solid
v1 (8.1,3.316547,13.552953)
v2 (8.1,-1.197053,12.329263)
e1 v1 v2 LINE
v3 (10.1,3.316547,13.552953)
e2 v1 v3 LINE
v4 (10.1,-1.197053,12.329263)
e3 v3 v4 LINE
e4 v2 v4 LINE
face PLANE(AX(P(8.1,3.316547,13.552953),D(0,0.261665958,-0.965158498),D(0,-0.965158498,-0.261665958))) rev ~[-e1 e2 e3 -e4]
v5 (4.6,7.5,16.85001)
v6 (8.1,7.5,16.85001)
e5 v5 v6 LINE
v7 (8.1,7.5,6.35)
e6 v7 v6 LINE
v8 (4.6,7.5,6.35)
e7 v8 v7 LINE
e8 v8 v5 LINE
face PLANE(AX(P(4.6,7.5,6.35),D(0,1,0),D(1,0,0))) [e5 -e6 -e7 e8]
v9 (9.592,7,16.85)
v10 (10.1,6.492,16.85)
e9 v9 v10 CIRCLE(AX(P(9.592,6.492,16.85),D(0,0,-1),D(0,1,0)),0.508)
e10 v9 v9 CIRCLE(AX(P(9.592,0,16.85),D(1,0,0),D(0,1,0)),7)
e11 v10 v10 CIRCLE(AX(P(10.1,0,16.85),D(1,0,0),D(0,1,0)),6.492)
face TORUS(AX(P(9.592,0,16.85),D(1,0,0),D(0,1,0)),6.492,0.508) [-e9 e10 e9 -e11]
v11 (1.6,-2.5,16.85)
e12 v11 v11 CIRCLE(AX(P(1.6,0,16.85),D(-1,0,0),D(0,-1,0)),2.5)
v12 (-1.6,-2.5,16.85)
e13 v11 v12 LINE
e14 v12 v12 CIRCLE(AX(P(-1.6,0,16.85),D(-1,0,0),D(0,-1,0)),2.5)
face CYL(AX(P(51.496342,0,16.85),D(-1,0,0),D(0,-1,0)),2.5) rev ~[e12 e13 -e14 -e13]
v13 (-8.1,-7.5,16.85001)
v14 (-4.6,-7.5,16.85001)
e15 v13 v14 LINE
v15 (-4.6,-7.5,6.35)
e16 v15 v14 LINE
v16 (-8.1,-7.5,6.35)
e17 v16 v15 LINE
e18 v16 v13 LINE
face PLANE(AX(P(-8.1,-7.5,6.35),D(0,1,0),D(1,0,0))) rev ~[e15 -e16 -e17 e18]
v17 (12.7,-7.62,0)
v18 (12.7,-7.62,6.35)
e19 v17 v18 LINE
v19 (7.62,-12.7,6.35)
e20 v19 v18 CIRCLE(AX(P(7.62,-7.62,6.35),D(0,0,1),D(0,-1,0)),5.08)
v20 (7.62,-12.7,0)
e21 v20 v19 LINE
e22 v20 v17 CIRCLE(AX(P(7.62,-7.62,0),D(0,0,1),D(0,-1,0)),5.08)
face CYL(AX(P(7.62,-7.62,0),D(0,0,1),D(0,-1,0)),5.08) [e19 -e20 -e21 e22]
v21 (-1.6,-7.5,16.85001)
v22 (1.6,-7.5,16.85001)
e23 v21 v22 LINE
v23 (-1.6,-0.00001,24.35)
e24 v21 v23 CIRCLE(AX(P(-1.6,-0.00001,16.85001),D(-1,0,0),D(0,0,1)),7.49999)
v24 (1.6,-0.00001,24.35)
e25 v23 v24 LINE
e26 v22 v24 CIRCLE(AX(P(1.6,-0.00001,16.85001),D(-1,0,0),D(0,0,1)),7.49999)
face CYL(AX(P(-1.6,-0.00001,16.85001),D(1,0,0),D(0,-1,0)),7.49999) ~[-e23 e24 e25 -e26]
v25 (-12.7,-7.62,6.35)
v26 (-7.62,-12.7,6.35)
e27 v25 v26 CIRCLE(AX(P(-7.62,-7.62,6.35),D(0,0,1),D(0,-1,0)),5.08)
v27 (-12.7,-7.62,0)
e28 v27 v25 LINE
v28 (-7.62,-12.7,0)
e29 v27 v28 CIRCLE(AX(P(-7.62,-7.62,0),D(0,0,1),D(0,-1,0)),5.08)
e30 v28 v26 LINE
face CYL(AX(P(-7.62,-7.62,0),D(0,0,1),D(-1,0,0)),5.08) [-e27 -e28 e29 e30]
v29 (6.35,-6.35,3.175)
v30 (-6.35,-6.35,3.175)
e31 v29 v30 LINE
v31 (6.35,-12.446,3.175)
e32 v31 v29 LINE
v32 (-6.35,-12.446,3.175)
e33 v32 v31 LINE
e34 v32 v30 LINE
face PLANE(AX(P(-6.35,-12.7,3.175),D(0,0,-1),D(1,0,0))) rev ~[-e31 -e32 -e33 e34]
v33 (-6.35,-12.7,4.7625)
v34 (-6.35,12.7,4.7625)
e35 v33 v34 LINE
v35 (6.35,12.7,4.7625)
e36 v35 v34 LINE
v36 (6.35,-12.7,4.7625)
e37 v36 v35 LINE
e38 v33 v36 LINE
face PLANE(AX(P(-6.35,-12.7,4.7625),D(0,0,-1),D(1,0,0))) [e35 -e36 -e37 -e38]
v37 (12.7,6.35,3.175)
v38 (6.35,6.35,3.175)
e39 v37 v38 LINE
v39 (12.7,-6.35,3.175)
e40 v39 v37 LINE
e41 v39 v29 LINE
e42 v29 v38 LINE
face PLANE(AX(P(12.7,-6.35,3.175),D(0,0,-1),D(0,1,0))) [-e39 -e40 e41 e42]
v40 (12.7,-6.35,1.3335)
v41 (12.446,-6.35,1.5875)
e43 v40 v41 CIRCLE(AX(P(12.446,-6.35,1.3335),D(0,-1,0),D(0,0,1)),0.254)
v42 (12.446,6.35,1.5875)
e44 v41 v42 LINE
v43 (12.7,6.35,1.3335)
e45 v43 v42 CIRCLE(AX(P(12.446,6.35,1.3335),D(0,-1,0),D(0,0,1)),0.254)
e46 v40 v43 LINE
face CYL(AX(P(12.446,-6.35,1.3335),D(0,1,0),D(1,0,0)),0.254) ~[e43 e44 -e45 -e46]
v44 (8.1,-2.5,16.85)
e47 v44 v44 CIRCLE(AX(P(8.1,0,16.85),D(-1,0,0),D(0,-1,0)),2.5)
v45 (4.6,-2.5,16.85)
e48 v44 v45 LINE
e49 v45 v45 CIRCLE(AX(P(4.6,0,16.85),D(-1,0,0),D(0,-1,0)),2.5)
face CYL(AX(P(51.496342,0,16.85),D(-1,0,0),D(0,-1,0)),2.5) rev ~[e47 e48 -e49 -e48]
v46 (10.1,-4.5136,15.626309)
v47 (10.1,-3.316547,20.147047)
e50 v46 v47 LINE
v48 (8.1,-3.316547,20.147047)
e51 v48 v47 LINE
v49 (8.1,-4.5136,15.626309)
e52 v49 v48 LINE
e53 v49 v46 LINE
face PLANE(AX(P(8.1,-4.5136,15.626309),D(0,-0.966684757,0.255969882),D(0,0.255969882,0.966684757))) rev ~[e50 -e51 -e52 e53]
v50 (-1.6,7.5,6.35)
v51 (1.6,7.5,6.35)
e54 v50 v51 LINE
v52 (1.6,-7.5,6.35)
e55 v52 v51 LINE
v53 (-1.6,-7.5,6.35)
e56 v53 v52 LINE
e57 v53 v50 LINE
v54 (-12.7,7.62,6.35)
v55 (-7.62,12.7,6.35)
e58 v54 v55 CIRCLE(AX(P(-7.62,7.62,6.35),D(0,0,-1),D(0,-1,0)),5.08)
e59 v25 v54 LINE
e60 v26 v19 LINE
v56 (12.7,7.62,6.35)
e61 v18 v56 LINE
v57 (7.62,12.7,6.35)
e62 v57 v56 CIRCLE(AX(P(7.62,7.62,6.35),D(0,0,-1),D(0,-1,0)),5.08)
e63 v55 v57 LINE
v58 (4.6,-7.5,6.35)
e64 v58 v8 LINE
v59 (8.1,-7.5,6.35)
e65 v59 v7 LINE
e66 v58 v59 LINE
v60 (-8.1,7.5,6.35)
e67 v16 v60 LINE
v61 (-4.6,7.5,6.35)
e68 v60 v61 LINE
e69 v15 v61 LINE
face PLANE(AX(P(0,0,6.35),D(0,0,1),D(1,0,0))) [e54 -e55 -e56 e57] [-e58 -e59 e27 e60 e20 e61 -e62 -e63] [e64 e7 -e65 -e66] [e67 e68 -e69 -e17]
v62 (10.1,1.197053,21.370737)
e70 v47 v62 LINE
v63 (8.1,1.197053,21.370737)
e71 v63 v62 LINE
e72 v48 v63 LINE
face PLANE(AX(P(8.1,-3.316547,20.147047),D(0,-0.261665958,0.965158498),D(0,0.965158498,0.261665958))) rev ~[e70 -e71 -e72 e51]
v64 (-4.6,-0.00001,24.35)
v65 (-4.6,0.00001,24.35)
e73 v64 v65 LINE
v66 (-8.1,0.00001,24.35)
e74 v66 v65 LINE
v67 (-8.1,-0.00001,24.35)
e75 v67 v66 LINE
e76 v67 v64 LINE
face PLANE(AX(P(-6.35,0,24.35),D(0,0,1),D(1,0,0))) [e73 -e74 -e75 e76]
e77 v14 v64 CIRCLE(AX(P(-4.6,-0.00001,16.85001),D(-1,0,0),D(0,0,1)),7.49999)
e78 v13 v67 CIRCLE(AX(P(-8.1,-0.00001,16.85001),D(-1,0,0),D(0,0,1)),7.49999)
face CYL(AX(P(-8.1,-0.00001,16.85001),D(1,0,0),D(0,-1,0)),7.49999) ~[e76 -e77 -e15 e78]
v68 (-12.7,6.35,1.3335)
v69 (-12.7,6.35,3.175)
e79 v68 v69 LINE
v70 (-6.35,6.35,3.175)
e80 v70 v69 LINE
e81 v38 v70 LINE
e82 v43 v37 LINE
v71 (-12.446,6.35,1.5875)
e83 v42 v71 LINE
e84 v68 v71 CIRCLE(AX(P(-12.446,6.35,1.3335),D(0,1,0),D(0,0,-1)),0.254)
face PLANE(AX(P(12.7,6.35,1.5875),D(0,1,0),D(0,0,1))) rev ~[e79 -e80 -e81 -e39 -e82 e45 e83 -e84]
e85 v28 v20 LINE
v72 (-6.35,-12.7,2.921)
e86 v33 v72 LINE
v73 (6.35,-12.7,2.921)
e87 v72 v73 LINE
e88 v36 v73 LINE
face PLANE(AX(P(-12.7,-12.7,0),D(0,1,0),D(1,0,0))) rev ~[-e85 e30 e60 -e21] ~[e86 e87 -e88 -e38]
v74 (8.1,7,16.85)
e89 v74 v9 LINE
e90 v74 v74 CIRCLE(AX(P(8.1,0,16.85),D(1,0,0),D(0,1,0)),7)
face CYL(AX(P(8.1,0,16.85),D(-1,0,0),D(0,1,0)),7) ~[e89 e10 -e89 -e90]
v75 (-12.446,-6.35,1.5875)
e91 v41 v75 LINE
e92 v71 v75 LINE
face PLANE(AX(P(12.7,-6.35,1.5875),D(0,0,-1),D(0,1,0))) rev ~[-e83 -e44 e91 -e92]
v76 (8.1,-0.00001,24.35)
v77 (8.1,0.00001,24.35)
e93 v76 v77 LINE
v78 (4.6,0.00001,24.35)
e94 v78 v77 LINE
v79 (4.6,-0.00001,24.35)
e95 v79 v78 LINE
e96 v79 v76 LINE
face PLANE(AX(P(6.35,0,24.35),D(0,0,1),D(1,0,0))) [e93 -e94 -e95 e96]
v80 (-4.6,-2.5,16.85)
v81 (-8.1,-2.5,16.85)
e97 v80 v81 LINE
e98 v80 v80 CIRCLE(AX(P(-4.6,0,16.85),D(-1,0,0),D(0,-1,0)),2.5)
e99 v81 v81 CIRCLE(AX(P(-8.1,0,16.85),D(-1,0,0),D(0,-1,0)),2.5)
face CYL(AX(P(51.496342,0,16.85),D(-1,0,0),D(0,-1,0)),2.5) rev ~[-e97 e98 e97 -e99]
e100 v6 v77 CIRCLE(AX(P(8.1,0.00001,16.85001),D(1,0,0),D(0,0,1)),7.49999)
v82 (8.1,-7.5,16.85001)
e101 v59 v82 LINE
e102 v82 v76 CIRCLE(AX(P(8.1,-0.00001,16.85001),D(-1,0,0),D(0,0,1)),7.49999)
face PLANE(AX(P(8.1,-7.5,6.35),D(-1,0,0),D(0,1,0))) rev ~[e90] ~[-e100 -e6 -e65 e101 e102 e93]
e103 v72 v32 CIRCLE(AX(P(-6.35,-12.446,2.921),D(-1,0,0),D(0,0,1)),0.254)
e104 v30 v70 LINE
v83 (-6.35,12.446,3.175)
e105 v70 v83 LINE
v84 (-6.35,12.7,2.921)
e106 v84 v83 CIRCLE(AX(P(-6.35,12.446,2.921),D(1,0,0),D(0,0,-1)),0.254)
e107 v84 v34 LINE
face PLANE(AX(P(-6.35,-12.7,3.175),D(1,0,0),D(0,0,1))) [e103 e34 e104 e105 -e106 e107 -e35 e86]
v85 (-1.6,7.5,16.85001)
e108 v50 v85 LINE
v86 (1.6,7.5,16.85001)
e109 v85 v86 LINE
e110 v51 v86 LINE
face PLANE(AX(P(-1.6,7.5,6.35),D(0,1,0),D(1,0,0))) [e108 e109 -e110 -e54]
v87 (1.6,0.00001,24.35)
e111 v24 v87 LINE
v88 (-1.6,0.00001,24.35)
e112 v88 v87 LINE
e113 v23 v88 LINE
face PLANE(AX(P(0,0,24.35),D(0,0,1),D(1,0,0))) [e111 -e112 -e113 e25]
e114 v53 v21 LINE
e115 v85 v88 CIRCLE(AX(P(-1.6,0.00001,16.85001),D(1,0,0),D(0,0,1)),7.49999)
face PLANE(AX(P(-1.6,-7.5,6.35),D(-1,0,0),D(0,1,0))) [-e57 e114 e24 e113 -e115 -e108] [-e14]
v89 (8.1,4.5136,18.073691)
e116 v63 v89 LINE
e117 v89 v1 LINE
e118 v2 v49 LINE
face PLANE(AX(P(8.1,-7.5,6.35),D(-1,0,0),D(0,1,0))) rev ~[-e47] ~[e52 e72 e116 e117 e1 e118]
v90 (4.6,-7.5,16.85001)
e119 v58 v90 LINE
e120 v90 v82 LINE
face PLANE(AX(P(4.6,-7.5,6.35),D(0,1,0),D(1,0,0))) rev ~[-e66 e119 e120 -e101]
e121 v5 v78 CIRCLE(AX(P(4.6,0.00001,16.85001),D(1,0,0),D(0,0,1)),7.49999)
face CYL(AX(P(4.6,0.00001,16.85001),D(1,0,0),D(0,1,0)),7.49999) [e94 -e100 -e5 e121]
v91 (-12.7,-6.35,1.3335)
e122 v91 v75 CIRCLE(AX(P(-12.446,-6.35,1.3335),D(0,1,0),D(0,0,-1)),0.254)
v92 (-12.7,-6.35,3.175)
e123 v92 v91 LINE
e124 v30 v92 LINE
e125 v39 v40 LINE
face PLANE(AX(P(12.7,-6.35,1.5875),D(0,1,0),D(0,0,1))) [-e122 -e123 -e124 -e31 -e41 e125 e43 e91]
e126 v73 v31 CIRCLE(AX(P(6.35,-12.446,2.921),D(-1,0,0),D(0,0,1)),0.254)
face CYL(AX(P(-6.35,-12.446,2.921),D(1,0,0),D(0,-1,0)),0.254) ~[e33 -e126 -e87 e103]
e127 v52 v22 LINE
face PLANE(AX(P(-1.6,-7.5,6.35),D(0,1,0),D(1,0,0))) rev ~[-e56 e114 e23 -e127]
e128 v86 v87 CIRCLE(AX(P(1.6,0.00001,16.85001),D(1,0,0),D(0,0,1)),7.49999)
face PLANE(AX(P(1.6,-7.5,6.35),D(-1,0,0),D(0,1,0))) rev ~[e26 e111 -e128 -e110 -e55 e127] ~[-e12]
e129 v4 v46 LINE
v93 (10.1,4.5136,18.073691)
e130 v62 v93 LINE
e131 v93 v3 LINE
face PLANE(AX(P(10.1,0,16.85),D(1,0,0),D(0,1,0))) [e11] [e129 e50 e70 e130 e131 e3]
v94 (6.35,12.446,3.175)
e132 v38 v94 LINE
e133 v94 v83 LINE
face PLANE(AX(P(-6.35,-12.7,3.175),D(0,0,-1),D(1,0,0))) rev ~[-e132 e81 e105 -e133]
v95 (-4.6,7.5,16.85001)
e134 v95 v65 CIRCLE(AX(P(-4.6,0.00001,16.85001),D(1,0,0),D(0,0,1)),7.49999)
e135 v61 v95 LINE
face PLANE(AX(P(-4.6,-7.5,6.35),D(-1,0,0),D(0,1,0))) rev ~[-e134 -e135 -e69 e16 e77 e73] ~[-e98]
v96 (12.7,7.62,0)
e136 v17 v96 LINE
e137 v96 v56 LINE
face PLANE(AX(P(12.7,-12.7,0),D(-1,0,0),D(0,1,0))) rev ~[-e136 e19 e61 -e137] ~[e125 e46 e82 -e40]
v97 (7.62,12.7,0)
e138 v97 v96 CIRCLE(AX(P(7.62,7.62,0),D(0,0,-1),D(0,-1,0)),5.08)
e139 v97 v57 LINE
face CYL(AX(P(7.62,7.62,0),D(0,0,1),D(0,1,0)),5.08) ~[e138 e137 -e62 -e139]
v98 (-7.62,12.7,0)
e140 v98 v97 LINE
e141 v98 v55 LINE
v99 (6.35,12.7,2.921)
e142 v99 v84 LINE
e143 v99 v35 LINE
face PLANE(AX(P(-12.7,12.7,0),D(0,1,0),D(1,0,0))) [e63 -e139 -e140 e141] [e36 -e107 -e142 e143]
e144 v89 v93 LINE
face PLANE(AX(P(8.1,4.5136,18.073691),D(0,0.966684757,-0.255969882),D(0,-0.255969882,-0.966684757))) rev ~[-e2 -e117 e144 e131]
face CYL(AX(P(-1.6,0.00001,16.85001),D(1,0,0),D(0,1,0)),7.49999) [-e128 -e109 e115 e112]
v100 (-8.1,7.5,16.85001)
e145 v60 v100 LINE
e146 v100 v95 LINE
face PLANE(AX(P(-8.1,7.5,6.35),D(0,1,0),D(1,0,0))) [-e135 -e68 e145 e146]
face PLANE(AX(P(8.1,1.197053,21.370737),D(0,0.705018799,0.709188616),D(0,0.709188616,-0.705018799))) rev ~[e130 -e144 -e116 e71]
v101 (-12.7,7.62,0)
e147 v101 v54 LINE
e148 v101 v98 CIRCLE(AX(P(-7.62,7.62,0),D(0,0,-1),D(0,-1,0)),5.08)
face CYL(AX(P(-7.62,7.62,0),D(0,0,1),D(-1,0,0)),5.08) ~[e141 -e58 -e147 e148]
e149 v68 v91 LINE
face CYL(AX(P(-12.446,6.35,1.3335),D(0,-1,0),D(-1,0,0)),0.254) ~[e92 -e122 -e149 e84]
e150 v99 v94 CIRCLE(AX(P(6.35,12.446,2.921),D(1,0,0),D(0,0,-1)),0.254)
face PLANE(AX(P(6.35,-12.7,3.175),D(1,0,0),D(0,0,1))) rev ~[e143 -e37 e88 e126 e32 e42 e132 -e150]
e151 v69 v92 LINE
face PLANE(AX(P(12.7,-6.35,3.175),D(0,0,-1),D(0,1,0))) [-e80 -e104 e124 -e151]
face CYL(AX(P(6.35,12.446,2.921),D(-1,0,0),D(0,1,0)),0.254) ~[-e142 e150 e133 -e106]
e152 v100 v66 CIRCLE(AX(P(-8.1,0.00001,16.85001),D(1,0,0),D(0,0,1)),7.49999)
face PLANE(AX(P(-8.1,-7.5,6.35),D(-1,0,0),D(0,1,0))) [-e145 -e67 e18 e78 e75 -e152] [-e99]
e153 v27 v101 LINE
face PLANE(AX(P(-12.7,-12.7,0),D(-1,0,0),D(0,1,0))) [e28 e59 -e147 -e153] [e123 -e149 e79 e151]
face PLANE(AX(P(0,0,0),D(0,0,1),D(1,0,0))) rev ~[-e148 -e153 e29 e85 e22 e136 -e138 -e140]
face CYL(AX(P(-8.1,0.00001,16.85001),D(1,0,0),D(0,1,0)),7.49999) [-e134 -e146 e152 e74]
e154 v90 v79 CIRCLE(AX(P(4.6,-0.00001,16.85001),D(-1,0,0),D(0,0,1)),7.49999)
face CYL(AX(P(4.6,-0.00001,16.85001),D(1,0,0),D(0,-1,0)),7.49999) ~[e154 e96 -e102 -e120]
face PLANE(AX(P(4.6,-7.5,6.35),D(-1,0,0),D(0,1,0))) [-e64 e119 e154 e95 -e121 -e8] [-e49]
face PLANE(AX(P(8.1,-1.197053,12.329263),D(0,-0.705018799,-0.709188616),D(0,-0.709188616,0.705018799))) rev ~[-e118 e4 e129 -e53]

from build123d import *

# Parameters (mm, degrees)
F0_W      = 25.4
F0_H      = 25.4
F1_DEPTH  = 6.35
F2_W      = 12.7
F2_H      = 1.5875
F3_DEPTH  = 25.401
F4_W      = 12.7
F4_H      = 1.5875
F5_DEPTH  = 25.401
F6_W      = 3.5
F6_H      = 15
F6_W_2    = 3.2
F7_DEPTH  = 18
F8_R      = 7.49999
F9_R      = 5.08
F10_R     = 7
F11_DEPTH = 2
F12_D     = 5
F13_R     = 0.508
F14_R     = 0.254


# Not quite as in the source:
# - a fillet or chamfer is up to 0.001 mm smaller than in the source, because OpenCascade refuses the exact size


with BuildPart() as f1:
    # F0 (on Top) → F1 (new body)
    with BuildSketch(Plane.XY):
        Rectangle(F0_W, F0_H)
    extrude(amount=F1_DEPTH)

    # F2 (on face) → F3 (cut, through all)
    with BuildSketch(Plane.YZ.offset(12.7)):
        with Locations((0, 2.38125)):
            Rectangle(F2_W, F2_H)
    extrude(amount=-F3_DEPTH, mode=Mode.SUBTRACT)

    # F4 (on face) → F5 (cut, through all)
    with BuildSketch(Plane.XZ.offset(12.7)):
        with Locations((0, 3.96875)):
            Rectangle(F4_W, F4_H)
    extrude(amount=-F5_DEPTH, mode=Mode.SUBTRACT)

    # F6 (on face) → F7 (join)
    with BuildSketch(Plane.XY.offset(6.35)):
        with Locations((-6.35, 0)):
            Rectangle(F6_W, F6_H)
        Rectangle(F6_W_2, F6_H)
        with Locations((6.35, 0)):
            Rectangle(F6_W, F6_H)
    extrude(amount=F7_DEPTH)

    # F8 (radius 7.5 in the source; OpenCascade refuses exactly that, so slightly less here)
    f8_edges = [f1.edges().sort_by_distance(p)[0] for p in [
        (6.35, -7.5, 24.35),
        (0, -7.5, 24.35),
        (-6.35, -7.5, 24.35),
        (-6.35, 7.5, 24.35),
        (6.35, 7.5, 24.35),
        (0, 7.5, 24.35),
    ]]
    fillet(f8_edges, radius=F8_R)

    # F9
    f9_edges = [f1.edges().sort_by_distance(p)[0] for p in [
        (12.7, 12.7, 3.175),
        (12.7, -12.7, 3.175),
        (-12.7, 12.7, 3.175),
        (-12.7, -12.7, 3.175),
    ]]
    fillet(f9_edges, radius=F9_R)

    # F10 (on face) → F11 (join)
    with BuildSketch(Plane.YZ.offset(8.1)):
        with Locations((0, 16.85)):
            Circle(F10_R)
        Polygon((-4.5135996016, 15.6263094195), (-3.3165469299, 20.1470466272), (1.1970526717, 21.3707372077), (4.5135996016, 18.0736905805), (3.3165469299, 13.5529533728), (-1.1970526717, 12.3292627923), align=None, mode=Mode.SUBTRACT)
    extrude(amount=F11_DEPTH)

    # F12 (through all)
    with Locations(Plane.YZ.offset(8.1)):
        with Locations((0, 16.85)):
            Hole(F12_D / 2)

    # F13
    f13_edges = [f1.edges().sort_by_distance(p)[0] for p in [
        (10.1, -7, 16.85),
    ]]
    fillet(f13_edges, radius=F13_R)

    # F14
    f14_edges = [f1.edges().sort_by_distance(p)[0] for p in [
        (-12.7, 0, 1.5875),
        (0, -12.7, 3.175),
        (12.7, 0, 1.5875),
        (0, 12.7, 3.175),
    ]]
    fillet(f14_edges, radius=F14_R)


solid = f1.part
